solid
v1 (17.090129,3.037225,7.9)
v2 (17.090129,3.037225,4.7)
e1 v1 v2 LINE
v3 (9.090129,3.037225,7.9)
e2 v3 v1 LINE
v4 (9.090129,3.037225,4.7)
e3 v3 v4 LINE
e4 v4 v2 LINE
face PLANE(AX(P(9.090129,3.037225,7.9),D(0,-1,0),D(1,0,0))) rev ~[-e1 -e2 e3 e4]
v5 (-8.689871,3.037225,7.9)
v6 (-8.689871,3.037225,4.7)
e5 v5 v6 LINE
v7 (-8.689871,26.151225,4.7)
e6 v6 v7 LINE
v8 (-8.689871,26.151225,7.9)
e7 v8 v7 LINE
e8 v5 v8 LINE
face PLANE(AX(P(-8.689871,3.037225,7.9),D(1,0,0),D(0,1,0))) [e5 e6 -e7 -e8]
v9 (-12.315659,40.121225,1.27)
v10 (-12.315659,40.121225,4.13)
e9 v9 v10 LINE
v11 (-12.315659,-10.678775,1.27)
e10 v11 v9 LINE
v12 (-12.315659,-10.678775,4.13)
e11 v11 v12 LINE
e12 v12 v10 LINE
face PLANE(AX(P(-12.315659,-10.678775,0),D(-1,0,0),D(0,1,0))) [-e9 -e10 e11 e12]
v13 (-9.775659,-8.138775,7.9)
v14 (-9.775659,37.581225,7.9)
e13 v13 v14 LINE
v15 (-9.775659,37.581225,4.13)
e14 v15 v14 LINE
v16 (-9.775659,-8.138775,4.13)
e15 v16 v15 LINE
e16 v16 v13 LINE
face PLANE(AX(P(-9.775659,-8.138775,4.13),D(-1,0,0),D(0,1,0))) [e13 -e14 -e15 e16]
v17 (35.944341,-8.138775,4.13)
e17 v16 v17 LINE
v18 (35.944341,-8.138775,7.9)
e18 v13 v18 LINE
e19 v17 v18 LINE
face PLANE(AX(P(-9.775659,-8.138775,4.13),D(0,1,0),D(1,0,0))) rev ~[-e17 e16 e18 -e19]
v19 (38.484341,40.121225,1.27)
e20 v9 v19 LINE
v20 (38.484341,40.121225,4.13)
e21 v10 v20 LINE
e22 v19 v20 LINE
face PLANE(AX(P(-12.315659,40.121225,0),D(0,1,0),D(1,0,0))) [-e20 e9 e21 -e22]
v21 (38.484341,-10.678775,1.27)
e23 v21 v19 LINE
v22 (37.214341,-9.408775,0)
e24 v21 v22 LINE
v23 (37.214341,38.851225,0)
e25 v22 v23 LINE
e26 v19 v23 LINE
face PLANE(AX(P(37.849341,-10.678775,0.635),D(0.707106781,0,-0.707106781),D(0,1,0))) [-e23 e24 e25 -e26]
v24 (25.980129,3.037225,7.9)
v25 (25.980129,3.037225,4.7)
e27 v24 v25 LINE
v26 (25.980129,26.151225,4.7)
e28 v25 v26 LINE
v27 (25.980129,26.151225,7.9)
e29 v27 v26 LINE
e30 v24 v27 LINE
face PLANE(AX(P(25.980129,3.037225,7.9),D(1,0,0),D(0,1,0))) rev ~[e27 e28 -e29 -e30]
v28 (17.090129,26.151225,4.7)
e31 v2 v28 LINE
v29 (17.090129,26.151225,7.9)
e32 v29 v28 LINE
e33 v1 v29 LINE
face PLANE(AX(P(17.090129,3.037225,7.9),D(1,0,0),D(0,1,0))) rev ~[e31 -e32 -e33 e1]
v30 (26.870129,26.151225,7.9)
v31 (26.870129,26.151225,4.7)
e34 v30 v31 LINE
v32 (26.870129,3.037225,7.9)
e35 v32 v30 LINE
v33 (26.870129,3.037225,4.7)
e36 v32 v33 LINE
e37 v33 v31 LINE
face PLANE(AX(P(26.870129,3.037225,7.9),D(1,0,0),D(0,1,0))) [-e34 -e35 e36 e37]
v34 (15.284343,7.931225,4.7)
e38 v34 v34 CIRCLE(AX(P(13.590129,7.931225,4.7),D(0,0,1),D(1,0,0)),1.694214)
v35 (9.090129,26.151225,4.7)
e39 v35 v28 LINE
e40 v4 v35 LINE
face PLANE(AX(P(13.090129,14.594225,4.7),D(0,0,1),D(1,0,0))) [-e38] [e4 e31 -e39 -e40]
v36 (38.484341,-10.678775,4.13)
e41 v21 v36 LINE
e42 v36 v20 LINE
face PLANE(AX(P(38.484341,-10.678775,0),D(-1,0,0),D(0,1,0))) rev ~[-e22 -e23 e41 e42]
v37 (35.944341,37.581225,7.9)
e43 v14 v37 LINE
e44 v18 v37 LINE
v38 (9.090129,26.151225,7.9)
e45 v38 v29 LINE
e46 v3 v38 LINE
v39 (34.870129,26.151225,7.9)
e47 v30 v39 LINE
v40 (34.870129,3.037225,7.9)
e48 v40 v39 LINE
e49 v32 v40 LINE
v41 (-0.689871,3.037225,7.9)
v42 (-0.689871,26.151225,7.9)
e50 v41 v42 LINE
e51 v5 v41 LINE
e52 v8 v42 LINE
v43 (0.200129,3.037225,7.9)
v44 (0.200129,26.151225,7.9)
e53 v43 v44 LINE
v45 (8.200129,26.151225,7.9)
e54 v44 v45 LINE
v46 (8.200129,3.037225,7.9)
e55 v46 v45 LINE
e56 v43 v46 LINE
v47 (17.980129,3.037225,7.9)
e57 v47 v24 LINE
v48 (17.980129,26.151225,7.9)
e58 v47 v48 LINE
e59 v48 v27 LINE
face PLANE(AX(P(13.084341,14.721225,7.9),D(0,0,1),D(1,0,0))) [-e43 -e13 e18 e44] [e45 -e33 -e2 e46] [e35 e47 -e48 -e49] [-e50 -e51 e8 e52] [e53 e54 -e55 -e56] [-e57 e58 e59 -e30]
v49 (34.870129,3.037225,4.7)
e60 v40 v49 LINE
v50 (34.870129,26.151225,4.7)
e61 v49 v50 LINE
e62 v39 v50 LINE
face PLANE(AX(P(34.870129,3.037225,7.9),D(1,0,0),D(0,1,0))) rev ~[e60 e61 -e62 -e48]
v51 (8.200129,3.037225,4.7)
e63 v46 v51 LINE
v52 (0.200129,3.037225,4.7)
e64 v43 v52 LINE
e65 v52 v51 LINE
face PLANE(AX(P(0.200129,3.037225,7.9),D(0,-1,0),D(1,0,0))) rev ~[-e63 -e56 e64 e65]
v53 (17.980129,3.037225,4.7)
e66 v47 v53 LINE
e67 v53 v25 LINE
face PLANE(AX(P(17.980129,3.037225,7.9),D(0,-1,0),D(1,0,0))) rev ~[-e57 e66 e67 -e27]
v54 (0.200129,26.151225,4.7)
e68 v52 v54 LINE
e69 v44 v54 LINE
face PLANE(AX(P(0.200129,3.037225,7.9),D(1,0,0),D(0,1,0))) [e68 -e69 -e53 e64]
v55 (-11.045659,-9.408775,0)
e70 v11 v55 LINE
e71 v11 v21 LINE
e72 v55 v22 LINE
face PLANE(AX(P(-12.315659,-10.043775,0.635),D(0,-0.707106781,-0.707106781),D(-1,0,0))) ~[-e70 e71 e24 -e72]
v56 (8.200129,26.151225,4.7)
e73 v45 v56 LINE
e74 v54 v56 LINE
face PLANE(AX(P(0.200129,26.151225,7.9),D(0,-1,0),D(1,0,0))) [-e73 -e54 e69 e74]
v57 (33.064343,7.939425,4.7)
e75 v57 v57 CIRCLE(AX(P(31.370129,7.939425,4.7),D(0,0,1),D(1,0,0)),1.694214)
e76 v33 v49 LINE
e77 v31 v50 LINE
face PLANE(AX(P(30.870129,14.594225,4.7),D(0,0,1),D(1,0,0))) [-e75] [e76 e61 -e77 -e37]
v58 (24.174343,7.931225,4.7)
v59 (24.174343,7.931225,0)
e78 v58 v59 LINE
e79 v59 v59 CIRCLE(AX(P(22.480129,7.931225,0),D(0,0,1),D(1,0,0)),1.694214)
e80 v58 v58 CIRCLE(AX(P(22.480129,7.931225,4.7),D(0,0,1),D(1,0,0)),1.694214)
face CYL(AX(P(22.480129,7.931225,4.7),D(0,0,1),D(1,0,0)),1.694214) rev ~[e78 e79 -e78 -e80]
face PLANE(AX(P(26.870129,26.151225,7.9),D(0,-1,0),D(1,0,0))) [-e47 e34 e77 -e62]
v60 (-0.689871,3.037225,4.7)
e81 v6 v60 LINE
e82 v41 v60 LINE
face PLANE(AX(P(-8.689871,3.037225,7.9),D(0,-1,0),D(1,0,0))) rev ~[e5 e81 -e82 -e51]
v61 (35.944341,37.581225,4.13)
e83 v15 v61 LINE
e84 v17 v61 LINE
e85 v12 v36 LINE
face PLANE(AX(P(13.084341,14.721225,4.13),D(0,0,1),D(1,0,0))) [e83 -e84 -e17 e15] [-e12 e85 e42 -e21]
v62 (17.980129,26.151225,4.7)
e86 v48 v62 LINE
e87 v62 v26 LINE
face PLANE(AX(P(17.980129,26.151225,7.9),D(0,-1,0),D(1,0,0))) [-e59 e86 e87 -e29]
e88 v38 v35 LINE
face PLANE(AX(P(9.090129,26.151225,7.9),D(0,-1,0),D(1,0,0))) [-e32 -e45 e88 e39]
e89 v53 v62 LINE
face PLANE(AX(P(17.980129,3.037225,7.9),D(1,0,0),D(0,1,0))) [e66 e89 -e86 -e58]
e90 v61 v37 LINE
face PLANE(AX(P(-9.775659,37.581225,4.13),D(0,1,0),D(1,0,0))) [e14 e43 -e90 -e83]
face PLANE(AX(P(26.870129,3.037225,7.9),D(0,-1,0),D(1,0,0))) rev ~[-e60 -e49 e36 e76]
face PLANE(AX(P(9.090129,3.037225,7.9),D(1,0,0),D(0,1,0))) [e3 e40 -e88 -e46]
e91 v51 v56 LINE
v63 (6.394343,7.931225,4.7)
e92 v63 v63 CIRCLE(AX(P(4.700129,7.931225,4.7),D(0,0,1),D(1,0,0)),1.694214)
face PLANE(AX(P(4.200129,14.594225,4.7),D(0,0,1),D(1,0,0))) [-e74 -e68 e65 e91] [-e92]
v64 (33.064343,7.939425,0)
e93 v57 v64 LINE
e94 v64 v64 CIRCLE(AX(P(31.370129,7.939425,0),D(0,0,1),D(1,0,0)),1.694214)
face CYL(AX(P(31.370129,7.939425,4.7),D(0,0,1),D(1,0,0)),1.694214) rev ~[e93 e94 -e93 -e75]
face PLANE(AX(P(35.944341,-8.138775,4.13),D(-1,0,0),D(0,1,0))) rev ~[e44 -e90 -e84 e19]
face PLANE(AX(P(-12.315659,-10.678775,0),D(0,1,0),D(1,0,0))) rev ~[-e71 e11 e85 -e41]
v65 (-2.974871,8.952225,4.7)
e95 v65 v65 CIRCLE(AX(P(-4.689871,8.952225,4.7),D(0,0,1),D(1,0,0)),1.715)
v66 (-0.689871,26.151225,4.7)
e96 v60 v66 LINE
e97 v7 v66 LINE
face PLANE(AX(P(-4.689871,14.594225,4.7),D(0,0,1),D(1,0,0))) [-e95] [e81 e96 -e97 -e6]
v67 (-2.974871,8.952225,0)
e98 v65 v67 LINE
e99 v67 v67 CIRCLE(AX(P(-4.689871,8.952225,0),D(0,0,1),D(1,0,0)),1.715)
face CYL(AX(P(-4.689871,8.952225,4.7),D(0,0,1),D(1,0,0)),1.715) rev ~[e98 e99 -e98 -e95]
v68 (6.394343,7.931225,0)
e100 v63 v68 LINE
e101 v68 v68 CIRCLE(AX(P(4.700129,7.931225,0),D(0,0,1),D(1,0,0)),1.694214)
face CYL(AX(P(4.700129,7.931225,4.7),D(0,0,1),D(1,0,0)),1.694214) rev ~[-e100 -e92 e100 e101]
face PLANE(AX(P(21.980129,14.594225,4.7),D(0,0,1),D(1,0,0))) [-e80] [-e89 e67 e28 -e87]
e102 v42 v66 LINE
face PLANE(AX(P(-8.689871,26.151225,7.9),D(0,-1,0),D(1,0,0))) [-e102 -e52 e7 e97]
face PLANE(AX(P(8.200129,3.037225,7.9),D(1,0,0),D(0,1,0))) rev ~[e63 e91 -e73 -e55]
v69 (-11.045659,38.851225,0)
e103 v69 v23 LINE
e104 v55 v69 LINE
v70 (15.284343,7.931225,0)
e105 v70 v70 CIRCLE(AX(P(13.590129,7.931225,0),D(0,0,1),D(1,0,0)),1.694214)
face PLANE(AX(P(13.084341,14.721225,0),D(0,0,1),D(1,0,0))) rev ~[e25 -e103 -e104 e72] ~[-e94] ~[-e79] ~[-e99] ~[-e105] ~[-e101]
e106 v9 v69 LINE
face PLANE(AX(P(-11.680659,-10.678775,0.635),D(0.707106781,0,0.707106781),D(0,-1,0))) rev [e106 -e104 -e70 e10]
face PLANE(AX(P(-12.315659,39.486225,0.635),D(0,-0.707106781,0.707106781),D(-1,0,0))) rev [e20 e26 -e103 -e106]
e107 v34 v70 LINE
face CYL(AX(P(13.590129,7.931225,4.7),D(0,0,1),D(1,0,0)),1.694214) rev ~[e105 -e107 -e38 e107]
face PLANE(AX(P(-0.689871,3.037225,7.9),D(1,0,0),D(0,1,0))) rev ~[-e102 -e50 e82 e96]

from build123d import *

# Parameters (mm, degrees)
F0_W      = 50.8
F0_H      = 50.8
F1_DEPTH  = 4.13
F3_W      = 45.72
F3_H      = 45.72
F4_DEPTH  = 3.77
F5_W      = 8
F5_H      = 23.114
F6_DEPTH  = 3.2
F7_R      = 1.715
F8_DEPTH  = 25.4
F9_SIZE   = 1.27
F10_R     = 1.694213851
F11_DEPTH = 25.4


# Not quite as in the source:
# - a feature names something its author has since deleted; it is built from what else it names


with BuildPart() as f1:
    # F0 (on Top) → F1 (new body)
    with BuildSketch(Plane.XY):
        with Locations((13.0843408406, 14.7212249442)):
            Rectangle(F0_W, F0_H)
    extrude(amount=F1_DEPTH)

    # F3 (on face) → F4 (join)
    with BuildSketch(Plane.XY.offset(4.13)):
        with Locations((13.0843408406, 14.7212249442)):
            Rectangle(F3_W, F3_H)
    extrude(amount=F4_DEPTH)

    # F5 (on face) → F6 (cut)
    with BuildSketch(Plane.XY.offset(7.9)):
        with Locations((4.2001288666, 14.5942249442)):
            Rectangle(F5_W, F5_H)
        with Locations((13.0901288666, 14.5942249442)):
            Rectangle(F5_W, F5_H)
        with Locations((21.9801288666, 14.5942249442)):
            Rectangle(F5_W, F5_H)
        with Locations((30.8701288666, 14.5942249442)):
            Rectangle(F5_W, F5_H)
        with Locations((-4.6898711334, 14.5942249442)):
            Rectangle(F5_W, F5_H)
    extrude(amount=-F6_DEPTH, mode=Mode.SUBTRACT)

    # F7 (on face) → F8 (cut)
    with BuildSketch(Plane.XY.offset(4.7)):
        with Locations((-4.6898711334, 8.9522249442)):
            Circle(F7_R)
    extrude(amount=-F8_DEPTH, mode=Mode.SUBTRACT)

    # F9
    f9_edges = [f1.edges().sort_by_distance(p)[0] for p in [
        (13.084341, -10.678775, 0),
        (13.084341, 40.121225, 0),
        (-12.315659, 14.721225, 0),
        (38.484341, 14.721225, 0),
    ]]
    chamfer(f9_edges, length=F9_SIZE)

    # F10 (on face) → F11 (cut)
    with BuildSketch(Plane.XY.offset(4.7)):
        with Locations((4.7001288666, 7.9312249442)):
            Circle(F10_R)
        with Locations((13.5901288666, 7.9312249442)):
            Circle(F10_R)
        with Locations((22.4801288666, 7.9312249442)):
            Circle(F10_R)
        with Locations((31.3701288666, 7.9394249442)):
            Circle(F10_R)
    extrude(amount=-F11_DEPTH, mode=Mode.SUBTRACT)


solid = f1.part
